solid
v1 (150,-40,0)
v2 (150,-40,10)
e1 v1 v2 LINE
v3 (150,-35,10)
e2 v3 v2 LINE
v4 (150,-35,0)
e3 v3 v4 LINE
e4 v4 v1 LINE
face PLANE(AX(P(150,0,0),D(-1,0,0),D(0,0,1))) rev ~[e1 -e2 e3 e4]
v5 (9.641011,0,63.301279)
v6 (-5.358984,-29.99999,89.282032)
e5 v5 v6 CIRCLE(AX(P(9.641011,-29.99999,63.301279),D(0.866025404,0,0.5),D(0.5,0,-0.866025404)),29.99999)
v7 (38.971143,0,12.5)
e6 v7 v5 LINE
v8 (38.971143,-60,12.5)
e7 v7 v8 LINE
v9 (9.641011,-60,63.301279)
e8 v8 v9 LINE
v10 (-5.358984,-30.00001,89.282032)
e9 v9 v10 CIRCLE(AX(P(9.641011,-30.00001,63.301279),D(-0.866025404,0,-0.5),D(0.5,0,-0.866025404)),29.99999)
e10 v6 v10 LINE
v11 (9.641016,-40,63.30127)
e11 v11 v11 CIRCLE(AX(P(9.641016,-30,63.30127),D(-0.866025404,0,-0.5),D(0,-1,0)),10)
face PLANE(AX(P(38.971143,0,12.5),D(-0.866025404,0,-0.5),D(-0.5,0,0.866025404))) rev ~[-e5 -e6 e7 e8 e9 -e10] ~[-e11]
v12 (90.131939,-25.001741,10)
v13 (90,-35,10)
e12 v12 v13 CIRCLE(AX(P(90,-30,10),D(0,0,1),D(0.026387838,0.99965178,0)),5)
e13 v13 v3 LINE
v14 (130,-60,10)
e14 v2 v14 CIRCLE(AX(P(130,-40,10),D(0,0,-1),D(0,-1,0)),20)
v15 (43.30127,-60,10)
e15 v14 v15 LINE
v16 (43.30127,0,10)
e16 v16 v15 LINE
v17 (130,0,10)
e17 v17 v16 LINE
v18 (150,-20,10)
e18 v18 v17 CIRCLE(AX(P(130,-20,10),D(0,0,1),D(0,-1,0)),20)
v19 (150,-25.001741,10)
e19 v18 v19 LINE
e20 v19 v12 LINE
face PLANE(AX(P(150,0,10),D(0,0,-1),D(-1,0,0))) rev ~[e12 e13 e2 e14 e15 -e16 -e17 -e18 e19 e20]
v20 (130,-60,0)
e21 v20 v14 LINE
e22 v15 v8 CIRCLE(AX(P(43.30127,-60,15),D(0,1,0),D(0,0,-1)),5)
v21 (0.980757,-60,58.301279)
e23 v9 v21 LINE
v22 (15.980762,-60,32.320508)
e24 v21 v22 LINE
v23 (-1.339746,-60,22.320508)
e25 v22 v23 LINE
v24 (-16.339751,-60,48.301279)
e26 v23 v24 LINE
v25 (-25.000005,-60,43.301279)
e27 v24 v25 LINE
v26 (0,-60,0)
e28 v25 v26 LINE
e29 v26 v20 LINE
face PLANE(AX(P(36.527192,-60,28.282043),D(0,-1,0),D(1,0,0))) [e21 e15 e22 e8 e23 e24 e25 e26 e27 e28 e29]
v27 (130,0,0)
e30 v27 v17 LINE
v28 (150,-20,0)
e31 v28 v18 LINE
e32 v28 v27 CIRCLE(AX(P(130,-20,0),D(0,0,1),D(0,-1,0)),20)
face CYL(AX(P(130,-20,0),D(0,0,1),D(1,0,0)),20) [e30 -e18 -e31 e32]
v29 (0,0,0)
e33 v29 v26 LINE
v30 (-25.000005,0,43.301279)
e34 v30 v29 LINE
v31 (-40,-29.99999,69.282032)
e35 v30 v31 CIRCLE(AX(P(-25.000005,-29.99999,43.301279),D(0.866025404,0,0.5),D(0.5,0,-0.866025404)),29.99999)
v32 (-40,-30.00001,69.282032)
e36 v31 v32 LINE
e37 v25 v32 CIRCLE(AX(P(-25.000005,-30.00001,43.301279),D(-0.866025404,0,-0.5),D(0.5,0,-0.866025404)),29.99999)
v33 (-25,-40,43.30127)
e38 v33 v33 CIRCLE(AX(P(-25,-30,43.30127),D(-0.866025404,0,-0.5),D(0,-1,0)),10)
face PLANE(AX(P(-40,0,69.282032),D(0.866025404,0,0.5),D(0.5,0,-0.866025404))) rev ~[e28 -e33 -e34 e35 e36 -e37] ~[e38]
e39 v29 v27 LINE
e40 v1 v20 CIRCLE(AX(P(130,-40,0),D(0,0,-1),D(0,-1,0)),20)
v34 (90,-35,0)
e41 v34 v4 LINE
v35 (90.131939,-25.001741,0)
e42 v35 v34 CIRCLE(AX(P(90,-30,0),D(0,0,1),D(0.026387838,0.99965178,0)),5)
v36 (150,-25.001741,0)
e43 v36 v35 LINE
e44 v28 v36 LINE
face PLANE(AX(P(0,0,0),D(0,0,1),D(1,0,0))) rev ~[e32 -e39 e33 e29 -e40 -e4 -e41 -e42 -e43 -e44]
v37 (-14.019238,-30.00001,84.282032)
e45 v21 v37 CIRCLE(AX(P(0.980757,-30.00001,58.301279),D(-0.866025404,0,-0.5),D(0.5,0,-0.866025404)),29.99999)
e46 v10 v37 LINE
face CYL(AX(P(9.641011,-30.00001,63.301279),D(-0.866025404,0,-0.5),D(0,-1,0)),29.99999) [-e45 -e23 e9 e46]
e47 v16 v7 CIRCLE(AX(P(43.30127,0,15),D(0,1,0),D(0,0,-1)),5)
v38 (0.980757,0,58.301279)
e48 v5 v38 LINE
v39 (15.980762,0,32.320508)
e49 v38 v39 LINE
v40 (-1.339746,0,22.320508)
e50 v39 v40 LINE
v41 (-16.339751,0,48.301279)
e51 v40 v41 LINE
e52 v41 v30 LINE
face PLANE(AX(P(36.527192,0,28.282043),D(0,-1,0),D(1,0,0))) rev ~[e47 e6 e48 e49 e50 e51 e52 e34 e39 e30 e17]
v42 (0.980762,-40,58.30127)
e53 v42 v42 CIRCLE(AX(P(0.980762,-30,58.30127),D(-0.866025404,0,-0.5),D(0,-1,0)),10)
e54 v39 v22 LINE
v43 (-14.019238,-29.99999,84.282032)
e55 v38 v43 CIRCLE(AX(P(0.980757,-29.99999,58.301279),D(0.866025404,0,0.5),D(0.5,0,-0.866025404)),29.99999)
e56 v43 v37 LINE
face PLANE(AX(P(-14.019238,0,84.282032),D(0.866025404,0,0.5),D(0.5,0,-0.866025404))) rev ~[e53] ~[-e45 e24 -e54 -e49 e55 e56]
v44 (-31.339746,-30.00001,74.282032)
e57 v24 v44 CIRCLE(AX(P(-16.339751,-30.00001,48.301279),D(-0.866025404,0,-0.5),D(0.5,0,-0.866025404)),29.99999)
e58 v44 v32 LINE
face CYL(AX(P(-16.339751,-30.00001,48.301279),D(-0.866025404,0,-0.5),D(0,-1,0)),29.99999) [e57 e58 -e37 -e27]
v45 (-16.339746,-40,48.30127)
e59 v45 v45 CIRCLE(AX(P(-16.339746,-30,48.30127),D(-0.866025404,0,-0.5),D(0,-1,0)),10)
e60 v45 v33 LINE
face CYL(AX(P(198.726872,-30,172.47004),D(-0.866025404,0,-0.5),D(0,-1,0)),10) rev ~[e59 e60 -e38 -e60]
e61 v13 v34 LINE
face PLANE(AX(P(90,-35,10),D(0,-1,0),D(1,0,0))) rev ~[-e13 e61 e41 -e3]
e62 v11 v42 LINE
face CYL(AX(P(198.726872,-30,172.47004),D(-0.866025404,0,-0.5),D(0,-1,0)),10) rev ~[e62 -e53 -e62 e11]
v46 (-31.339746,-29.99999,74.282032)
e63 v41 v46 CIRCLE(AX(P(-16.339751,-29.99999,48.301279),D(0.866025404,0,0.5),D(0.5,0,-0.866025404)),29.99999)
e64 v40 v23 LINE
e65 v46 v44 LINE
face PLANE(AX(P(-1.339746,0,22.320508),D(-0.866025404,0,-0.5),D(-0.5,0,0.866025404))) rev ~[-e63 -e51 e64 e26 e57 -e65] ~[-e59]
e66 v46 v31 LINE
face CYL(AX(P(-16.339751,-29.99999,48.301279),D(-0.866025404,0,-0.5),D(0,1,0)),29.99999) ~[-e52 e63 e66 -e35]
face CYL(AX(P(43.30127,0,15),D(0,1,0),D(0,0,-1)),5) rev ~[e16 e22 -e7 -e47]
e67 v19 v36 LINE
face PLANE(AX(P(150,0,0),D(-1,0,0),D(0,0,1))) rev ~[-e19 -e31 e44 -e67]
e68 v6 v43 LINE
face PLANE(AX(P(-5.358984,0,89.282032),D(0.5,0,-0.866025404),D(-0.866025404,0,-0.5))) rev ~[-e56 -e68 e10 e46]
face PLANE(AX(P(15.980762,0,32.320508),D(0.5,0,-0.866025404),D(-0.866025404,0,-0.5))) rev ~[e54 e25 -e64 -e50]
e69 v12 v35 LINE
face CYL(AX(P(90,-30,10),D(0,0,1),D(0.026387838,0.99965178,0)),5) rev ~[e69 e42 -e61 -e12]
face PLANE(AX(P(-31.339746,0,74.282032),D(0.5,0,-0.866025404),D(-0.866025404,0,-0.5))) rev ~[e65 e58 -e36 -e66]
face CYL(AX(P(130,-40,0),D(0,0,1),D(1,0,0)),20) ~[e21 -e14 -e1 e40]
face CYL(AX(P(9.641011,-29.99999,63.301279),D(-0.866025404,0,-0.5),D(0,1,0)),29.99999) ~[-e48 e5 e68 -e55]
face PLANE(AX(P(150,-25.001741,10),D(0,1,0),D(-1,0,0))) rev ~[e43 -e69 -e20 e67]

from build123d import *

# Parameters (mm, degrees)
F1_DEPTH = 60
F2_R     = 20
F4_DEPTH = 10.001
F5_R     = 29.99999
F7_D     = 20


# Not quite as in the source:
# - a fillet or chamfer is up to 0.001 mm smaller than in the source, because OpenCascade refuses the exact size


with BuildPart() as f1:
    # F0 (on Front) → F1 (new body)
    with BuildSketch(Plane.XZ):
        with BuildLine():
            Line((-40, 69.2820323028), (0, 0))
            Line((0, 0), (150, 0))
            Line((150, 0), (150, 10))
            Line((150, 10), (43.3012701892, 10))
            ThreePointArc((43.3012701892, 10), (40.8012701892, 10.6698729811), (38.9711431703, 12.5))
            Line((38.9711431703, 12.5), (-5.3589838486, 89.2820323028))
            Line((-5.3589838486, 89.2820323028), (-14.0192378865, 84.2820323028))
            Line((-14.0192378865, 84.2820323028), (15.9807621135, 32.3205080757))
            Line((15.9807621135, 32.3205080757), (-1.3397459622, 22.3205080757))
            Line((-1.3397459622, 22.3205080757), (-31.3397459622, 74.2820323028))
            Line((-31.3397459622, 74.2820323028), (-40, 69.2820323028))
        make_face()
    extrude(amount=F1_DEPTH)

    # F2
    f2_edges = [f1.edges().sort_by_distance(p)[0] for p in [
        (150, 0, 5),
        (150, -60, 5),
    ]]
    fillet(f2_edges, radius=F2_R)

    # F3 (on face) → F4 (cut, through all)
    with BuildSketch(Plane.XY.offset(10)):
        with BuildLine():
            ThreePointArc((90, -35), (93.5355339059, -33.5355339059), (95, -30))
            ThreePointArc((95, -30), (93.5818777161, -26.5114255022), (90.1319391892, -25.0017410981))
            ThreePointArc((90.1319391892, -25.0017410981), (85.0004352935, -29.9340246617), (90, -35))
        make_face()
        with BuildLine():
            ThreePointArc((90.1319391892, -25.0017410981), (93.5818777161, -26.5114255022), (95, -30))
            ThreePointArc((95, -30), (93.5355339059, -33.5355339059), (90, -35))
            Line((90, -35), (150, -35))
            Line((150, -35), (150, -25.0017410981))
            Line((150, -25.0017410981), (90.1319391892, -25.0017410981))
        make_face()
    extrude(amount=-F4_DEPTH, mode=Mode.SUBTRACT)

    # F5 (radius 30 in the source; OpenCascade refuses exactly that, so slightly less here)
    f5_edges = [f1.edges().sort_by_distance(p)[0] for p in [
        (-9.689111, -60, 86.782032),
        (-9.689111, 0, 86.782032),
        (-35.669873, -60, 71.782032),
        (-35.669873, 0, 71.782032),
    ]]
    fillet(f5_edges, radius=F5_R)

    # F7 (through all)
    with Locations(Plane(origin=(34.6410161514, 0, 20), x_dir=(0, 1, 0), z_dir=(0.8660254038, 0, 0.5))):
        with Locations((-30, 50)):
            Hole(F7_D / 2)


solid = f1.part
